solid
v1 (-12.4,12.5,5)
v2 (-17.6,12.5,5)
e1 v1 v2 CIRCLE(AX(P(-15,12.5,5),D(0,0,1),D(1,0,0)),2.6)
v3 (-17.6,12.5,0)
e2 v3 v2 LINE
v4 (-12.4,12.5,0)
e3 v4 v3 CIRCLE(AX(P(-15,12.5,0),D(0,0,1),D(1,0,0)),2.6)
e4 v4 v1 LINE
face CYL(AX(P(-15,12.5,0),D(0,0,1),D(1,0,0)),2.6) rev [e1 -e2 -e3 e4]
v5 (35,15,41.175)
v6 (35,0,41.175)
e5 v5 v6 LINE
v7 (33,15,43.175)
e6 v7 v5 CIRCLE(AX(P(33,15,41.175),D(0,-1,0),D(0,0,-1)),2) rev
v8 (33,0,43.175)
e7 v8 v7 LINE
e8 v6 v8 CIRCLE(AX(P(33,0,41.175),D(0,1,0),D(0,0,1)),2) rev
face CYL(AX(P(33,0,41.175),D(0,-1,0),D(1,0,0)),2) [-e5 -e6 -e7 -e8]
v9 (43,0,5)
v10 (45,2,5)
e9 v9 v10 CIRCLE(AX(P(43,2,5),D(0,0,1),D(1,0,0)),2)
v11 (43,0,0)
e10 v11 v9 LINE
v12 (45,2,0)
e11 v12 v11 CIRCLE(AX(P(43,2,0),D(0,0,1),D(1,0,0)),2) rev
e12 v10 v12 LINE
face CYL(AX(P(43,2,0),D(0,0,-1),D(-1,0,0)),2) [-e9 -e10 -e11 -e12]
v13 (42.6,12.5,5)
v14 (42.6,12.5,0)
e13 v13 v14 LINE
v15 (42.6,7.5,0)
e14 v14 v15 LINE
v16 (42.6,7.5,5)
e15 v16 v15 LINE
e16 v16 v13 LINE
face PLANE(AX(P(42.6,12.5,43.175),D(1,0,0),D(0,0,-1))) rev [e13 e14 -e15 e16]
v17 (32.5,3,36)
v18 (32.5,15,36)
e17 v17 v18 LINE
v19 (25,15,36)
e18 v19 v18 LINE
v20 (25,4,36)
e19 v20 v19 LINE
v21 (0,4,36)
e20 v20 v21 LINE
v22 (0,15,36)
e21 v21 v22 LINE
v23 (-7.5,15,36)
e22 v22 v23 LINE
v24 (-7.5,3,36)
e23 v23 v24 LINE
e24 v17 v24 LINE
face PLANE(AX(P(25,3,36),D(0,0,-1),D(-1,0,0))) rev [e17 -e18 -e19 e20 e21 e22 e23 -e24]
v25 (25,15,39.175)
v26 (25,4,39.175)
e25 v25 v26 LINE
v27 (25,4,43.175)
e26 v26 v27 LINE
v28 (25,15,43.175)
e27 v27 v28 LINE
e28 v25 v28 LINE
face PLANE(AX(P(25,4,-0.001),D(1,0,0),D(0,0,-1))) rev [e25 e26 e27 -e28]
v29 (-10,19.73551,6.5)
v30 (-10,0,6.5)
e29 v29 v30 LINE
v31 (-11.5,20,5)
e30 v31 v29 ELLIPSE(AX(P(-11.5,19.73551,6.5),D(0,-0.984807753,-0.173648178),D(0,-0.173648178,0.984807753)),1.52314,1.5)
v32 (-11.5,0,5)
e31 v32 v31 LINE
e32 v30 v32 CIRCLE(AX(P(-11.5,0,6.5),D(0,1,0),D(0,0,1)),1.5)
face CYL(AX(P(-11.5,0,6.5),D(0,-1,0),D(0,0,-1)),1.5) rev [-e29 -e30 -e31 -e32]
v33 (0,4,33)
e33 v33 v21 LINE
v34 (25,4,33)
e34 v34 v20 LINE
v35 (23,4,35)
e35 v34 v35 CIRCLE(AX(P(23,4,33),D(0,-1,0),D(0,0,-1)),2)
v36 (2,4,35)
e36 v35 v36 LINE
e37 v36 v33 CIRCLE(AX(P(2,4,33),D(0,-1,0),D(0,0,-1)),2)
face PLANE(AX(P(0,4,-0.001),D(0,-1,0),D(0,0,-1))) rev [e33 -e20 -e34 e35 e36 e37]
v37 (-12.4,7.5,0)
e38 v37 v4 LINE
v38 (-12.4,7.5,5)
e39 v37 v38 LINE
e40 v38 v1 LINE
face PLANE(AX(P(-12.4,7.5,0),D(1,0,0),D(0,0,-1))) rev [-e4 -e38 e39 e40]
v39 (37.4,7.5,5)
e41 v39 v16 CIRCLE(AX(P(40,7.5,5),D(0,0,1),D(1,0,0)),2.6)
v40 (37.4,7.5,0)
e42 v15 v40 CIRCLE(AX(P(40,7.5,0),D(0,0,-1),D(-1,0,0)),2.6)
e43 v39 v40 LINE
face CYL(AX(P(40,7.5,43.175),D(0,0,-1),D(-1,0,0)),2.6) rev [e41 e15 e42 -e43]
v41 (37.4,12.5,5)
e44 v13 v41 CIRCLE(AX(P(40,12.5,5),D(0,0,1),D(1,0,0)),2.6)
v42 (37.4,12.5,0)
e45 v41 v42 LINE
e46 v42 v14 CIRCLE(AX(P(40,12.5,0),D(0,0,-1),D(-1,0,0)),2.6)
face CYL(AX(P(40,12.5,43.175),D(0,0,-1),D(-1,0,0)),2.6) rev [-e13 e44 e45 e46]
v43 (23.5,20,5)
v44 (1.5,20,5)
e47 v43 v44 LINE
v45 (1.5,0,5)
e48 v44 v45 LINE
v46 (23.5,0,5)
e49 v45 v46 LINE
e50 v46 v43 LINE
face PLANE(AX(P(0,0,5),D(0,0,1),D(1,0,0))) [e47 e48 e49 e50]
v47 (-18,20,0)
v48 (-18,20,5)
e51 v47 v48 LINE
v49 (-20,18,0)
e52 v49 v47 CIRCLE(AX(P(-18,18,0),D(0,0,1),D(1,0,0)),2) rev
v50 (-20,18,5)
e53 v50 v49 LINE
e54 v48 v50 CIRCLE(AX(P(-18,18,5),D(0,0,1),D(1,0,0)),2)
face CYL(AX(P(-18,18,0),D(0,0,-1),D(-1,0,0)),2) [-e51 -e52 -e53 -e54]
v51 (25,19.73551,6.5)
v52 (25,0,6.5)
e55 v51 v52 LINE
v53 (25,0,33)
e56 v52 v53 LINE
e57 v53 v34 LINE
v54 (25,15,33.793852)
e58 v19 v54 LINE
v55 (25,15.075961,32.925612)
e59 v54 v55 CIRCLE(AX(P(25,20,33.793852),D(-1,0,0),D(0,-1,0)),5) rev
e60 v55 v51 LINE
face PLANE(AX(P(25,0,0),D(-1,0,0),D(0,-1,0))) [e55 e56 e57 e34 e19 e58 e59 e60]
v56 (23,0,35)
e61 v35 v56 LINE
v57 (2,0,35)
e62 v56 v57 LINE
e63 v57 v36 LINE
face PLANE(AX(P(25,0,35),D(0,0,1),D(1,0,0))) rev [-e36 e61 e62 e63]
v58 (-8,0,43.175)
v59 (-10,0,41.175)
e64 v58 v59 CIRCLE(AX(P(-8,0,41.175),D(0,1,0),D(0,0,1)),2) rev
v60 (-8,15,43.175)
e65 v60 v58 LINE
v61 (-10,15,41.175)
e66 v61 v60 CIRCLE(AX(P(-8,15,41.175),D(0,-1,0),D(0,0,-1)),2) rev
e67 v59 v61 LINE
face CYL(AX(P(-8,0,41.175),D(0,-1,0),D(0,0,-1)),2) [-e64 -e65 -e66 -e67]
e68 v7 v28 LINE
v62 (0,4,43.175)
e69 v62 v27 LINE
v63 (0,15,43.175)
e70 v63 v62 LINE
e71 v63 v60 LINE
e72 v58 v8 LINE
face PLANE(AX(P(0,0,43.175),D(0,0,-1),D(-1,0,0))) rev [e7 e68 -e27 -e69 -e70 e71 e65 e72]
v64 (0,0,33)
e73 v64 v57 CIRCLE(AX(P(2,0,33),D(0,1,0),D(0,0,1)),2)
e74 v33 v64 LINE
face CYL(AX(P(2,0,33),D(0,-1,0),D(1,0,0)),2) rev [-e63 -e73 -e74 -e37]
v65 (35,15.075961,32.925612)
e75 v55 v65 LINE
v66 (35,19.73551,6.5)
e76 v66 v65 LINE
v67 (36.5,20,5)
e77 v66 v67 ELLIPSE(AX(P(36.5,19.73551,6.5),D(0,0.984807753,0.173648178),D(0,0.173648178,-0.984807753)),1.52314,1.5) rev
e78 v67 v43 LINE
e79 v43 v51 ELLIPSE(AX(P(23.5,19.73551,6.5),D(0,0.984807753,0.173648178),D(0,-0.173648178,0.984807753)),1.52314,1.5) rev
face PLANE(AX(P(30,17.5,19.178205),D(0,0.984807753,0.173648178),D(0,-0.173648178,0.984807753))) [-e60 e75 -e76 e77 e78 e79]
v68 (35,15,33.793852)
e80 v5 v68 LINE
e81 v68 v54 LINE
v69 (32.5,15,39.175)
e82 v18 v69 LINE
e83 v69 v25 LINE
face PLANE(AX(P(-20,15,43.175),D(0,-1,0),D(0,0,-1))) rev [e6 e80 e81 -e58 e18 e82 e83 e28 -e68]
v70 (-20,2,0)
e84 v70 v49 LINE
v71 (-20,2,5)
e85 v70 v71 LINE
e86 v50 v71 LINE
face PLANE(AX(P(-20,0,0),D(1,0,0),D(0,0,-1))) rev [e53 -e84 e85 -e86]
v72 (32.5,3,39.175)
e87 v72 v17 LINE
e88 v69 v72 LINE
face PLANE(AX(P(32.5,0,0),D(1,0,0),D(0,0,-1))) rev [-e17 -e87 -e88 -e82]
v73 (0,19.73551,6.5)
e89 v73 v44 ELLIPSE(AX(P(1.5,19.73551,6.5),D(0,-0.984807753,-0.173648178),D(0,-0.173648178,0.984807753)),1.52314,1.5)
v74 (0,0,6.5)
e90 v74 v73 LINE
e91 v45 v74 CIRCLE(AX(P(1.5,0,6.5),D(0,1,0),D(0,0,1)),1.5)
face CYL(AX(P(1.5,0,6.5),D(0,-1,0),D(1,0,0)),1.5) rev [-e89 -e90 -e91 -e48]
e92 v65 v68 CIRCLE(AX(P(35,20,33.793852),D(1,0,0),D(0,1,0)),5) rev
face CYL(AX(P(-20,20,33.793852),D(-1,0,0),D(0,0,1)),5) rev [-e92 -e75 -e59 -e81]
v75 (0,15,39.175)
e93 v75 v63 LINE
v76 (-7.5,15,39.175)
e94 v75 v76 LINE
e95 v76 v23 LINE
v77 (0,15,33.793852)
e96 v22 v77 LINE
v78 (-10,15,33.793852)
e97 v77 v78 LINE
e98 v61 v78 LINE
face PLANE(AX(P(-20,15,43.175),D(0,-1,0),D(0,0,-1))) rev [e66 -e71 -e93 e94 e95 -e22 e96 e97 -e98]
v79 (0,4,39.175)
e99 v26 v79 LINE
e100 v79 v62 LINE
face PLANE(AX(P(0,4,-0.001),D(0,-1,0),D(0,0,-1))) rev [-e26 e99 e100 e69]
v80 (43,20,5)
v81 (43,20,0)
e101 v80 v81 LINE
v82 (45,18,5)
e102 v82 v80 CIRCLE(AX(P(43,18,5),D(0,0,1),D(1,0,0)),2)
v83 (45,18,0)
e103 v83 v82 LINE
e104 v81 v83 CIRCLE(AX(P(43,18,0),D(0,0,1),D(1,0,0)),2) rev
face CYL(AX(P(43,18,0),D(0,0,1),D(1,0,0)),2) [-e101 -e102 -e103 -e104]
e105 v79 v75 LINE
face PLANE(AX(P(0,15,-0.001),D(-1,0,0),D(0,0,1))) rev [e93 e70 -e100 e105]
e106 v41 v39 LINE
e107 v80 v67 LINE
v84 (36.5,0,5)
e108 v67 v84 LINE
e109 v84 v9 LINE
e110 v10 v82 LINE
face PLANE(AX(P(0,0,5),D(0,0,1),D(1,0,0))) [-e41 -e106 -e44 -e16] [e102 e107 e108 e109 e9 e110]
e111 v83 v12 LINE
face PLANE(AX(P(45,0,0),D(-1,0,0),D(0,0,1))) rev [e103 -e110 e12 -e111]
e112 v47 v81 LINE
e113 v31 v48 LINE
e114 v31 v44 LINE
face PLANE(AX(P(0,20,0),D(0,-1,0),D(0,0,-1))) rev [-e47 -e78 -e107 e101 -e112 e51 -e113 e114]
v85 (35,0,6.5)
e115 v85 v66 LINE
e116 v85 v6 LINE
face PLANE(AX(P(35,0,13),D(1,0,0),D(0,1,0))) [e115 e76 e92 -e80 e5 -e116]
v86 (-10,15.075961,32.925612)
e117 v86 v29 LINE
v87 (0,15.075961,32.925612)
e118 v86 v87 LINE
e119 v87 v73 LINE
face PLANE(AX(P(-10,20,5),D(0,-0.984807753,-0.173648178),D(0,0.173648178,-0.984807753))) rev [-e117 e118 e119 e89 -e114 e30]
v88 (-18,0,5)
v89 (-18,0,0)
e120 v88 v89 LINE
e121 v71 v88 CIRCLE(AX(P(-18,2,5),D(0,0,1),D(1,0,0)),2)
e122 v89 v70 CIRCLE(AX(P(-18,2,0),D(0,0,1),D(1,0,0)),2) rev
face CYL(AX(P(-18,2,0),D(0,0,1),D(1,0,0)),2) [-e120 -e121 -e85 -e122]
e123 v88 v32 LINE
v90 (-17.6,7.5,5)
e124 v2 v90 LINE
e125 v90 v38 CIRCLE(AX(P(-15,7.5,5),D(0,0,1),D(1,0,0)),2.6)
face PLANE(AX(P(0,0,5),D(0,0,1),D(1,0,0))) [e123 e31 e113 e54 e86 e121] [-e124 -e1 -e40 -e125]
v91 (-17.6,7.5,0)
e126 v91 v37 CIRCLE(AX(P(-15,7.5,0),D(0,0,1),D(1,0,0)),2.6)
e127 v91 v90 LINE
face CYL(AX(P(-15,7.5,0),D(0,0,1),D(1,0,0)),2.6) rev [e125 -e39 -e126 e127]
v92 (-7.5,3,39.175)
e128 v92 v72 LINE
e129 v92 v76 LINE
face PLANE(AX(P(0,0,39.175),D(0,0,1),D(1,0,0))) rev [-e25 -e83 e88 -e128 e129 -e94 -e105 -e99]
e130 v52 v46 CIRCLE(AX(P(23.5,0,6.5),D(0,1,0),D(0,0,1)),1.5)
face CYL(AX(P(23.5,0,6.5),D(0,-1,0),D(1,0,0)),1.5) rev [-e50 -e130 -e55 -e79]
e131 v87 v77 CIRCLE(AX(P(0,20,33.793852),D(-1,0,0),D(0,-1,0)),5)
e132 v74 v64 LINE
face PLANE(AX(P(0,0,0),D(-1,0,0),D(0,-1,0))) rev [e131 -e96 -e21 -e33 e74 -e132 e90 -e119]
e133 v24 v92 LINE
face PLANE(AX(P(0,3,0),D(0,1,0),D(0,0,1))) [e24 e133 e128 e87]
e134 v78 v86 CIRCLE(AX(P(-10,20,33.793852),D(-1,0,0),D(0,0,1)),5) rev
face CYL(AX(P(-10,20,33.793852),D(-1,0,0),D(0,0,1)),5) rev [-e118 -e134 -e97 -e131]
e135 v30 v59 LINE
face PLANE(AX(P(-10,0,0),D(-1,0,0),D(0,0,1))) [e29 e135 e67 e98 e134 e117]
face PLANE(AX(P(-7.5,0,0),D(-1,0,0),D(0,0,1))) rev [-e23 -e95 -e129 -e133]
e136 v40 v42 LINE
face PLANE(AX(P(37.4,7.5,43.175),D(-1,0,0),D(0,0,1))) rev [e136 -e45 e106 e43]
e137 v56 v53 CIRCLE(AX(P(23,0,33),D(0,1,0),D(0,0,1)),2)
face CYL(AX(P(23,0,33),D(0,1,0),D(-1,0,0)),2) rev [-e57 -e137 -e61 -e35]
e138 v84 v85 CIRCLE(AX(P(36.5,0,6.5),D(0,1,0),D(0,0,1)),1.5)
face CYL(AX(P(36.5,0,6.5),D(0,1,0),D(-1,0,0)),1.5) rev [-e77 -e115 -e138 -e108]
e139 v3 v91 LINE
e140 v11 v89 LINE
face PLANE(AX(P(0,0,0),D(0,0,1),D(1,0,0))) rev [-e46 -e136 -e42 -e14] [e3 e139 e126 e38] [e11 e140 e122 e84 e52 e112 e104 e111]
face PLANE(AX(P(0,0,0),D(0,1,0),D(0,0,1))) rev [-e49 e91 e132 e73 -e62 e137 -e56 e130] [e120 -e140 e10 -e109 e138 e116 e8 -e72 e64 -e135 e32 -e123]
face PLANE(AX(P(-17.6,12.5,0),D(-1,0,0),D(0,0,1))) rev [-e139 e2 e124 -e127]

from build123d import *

# Parameters (mm, degrees)
BOSS_EXTRUDE1_DEPTH = 35
CUT_EXTRUDE1_DEPTH  = 25
SKETCH3_W           = 25
SKETCH3_H           = 28.356409098
BOSS_EXTRUDE2_DEPTH = 5
BOSS_EXTRUDE3_DEPTH = 10
SKETCH5_W           = 28.356409098
SKETCH5_H           = 20
BOSS_EXTRUDE4_DEPTH = 10
SKETCH6_W           = 55
SKETCH6_H           = 15
BOSS_EXTRUDE5_DEPTH = 9.818590902
SKETCH7_W           = 28.356409098
SKETCH7_H           = 20
BOSS_EXTRUDE6_DEPTH = 10
SKETCH8_W           = 65
SKETCH8_H           = 20
BOSS_EXTRUDE7_DEPTH = 5
SKETCH9_W           = 10
SKETCH9_H           = 20
CUT_EXTRUDE2_DEPTH  = 28.356409098
SKETCH10_W          = 9.818590902
SKETCH10_H          = 15
CUT_EXTRUDE3_DEPTH  = 10
SKETCH11_W          = 10
SKETCH11_H          = 20
CUT_EXTRUDE4_DEPTH  = 28.356409098
SKETCH12_W          = 15
SKETCH12_H          = 1.643590902
CUT_EXTRUDE5_DEPTH  = 25
SKETCH13_W          = 25
SKETCH13_H          = 20
CUT_EXTRUDE6_DEPTH  = 28.356409098
CUT_EXTRUDE7_REACH  = 64.926
SKETCH14_W          = 25
SKETCH14_H          = 11
SKETCH15_W          = 25
SKETCH15_H          = 3.175
CUT_EXTRUDE8_DEPTH  = 1
CUT_EXTRUDE9_REACH  = 72.854
SKETCH16_W          = 3.175
SKETCH16_H          = 12
CUT_EXTRUDE10_REACH = 72.854
SKETCH17_W          = 12
SKETCH17_H          = 3.175
CUT_EXTRUDE11_REACH = 67.491
SKETCH18_W          = 25
SKETCH18_H          = 11
CUT_EXTRUDE12_DEPTH = 66.491072865
CUT_EXTRUDE13_DEPTH = 63.308351166
FILLET1_R           = 1.5
FILLET2_R           = 2
FILLET3_R           = 5


with BuildPart() as part:
    # Boss-Extrude1: read off the stored shape, not the designer's step
    # Boss-Extrude1 outline → Boss-Extrude1 (new body)
    with BuildSketch(Plane.YZ):
        Polygon((0, 5), (20, 5), (15, 33.356409098), (0, 33.356409098), align=None)
    extrude(amount=BOSS_EXTRUDE1_DEPTH)

    # Sketch2 → Cut-Extrude1 (cut)
    with BuildSketch(Plane.ZY):
        Polygon((33.356409098, 15), (5, 20), (5, 15), align=None)
    extrude(amount=-CUT_EXTRUDE1_DEPTH, mode=Mode.SUBTRACT)

    # Sketch3 → Boss-Extrude2 (add)
    with BuildSketch(Plane(origin=(0, 15, 0), x_dir=(-1, 0, 0), z_dir=(0, 1, 0))):
        with Locations((-12.5, 19.178204549)):
            Rectangle(SKETCH3_W, SKETCH3_H)
    extrude(amount=BOSS_EXTRUDE2_DEPTH)

    # Sketch4 → Boss-Extrude3 (add)
    with BuildSketch(Plane.ZY):
        Polygon((5, 20), (33.356409098, 15), (33.356409098, 0), (5, 0), align=None)
    extrude(amount=BOSS_EXTRUDE3_DEPTH)

    # Sketch5 → Boss-Extrude4 (add)
    with BuildSketch(Plane.ZY.offset(10)):
        with Locations((19.178204549, 10)):
            Rectangle(SKETCH5_W, SKETCH5_H)
    extrude(amount=BOSS_EXTRUDE4_DEPTH)

    # Sketch6 → Boss-Extrude5 (add)
    with BuildSketch(Plane.XY.offset(33.356409098)):
        with Locations((7.5, 7.5)):
            Rectangle(SKETCH6_W, SKETCH6_H)
    extrude(amount=BOSS_EXTRUDE5_DEPTH)

    # Sketch7 → Boss-Extrude6 (add)
    with BuildSketch(Plane(origin=(35, 0, 0), x_dir=(0, 0, -1), z_dir=(1, 0, 0))):
        with Locations((-19.178204549, 10)):
            Rectangle(SKETCH7_W, SKETCH7_H)
    extrude(amount=BOSS_EXTRUDE6_DEPTH)

    # Sketch8 → Boss-Extrude7 (add)
    with BuildSketch(Plane(origin=(0, 0, 5), x_dir=(-1, 0, 0), z_dir=(0, 0, -1))):
        with Locations((-12.5, 10)):
            Rectangle(SKETCH8_W, SKETCH8_H)
    extrude(amount=BOSS_EXTRUDE7_DEPTH)

    # Sketch9 → Cut-Extrude2 (cut)
    with BuildSketch(Plane.XY.offset(33.356409098)):
        with Locations((40, 10)):
            Rectangle(SKETCH9_W, SKETCH9_H)
    extrude(amount=-CUT_EXTRUDE2_DEPTH, mode=Mode.SUBTRACT)

    # Sketch10 → Cut-Extrude3 (cut)
    with BuildSketch(Plane.ZY.offset(20)):
        with Locations((38.265704549, 7.5)):
            Rectangle(SKETCH10_W, SKETCH10_H)
    extrude(amount=-CUT_EXTRUDE3_DEPTH, mode=Mode.SUBTRACT)

    # Sketch11 → Cut-Extrude4 (cut)
    with BuildSketch(Plane.XY.offset(33.356409098)):
        with Locations((-15, 10)):
            Rectangle(SKETCH11_W, SKETCH11_H)
    extrude(amount=-CUT_EXTRUDE4_DEPTH, mode=Mode.SUBTRACT)

    # Sketch12 → Cut-Extrude5 (cut)
    with BuildSketch(Plane(origin=(0, 0, 0), x_dir=(0, -1, 0), z_dir=(-1, 0, 0))):
        with Locations((-7.5, 34.178204549)):
            Rectangle(SKETCH12_W, SKETCH12_H)
    extrude(amount=-CUT_EXTRUDE5_DEPTH, mode=Mode.SUBTRACT)

    # Sketch13 → Cut-Extrude6 (cut)
    with BuildSketch(Plane.XY.offset(33.356409098)):
        with Locations((12.5, 10)):
            Rectangle(SKETCH13_W, SKETCH13_H)
    extrude(amount=-CUT_EXTRUDE6_DEPTH, mode=Mode.SUBTRACT)

    # Sketch14 → Cut-Extrude7 (cut, up to next)
    with BuildSketch(Plane.XY.offset(39.175), mode=Mode.PRIVATE) as cut_extrude7_sk1:
        with Locations((12.5, 9.5)):
            Rectangle(SKETCH14_W, SKETCH14_H)
    cut_extrude7_tool1 = extrude(cut_extrude7_sk1.sketch, amount=-CUT_EXTRUDE7_REACH, mode=Mode.PRIVATE) & part.part
    add(cut_extrude7_tool1.solids().sort_by_distance((12.5, 9.5, 39.175))[0], mode=Mode.SUBTRACT)

    # Sketch15 → Cut-Extrude8 (cut)
    with BuildSketch(Plane(origin=(0, 4, 0), x_dir=(-1, 0, 0), z_dir=(0, 1, 0))):
        with Locations((-12.5, 37.5875)):
            Rectangle(SKETCH15_W, SKETCH15_H)
    extrude(amount=-CUT_EXTRUDE8_DEPTH, mode=Mode.SUBTRACT)

    # Sketch16 → Cut-Extrude9 (cut, up to next)
    with BuildSketch(Plane(origin=(32.5, 0, 0), x_dir=(0, 0, -1), z_dir=(1, 0, 0)), mode=Mode.PRIVATE) as cut_extrude9_sk1:
        with Locations((-37.5875, 9)):
            Rectangle(SKETCH16_W, SKETCH16_H)
    cut_extrude9_tool1 = extrude(cut_extrude9_sk1.sketch, amount=-CUT_EXTRUDE9_REACH, mode=Mode.PRIVATE) & part.part
    add(cut_extrude9_tool1.solids().sort_by_distance((32.5, 9, 37.5875))[0], mode=Mode.SUBTRACT)

    # Sketch17 → Cut-Extrude10 (cut, up to next)
    with BuildSketch(Plane(origin=(-7.5, 0, 0), x_dir=(0, -1, 0), z_dir=(-1, 0, 0)), mode=Mode.PRIVATE) as cut_extrude10_sk1:
        with Locations((-9, 37.5875)):
            Rectangle(SKETCH17_W, SKETCH17_H)
    cut_extrude10_tool1 = extrude(cut_extrude10_sk1.sketch, amount=-CUT_EXTRUDE10_REACH, mode=Mode.PRIVATE) & part.part
    add(cut_extrude10_tool1.solids().sort_by_distance((-7.5, 9, 37.5875))[0], mode=Mode.SUBTRACT)

    # Sketch18 → Cut-Extrude11 (cut, up to next)
    with BuildSketch(Plane.XY.offset(43.175), mode=Mode.PRIVATE) as cut_extrude11_sk1:
        with Locations((12.5, 9.5)):
            Rectangle(SKETCH18_W, SKETCH18_H)
    cut_extrude11_tool1 = extrude(cut_extrude11_sk1.sketch, amount=-CUT_EXTRUDE11_REACH, mode=Mode.PRIVATE) & part.part
    add(cut_extrude11_tool1.solids().sort_by_distance((12.5, 9.5, 43.175))[0], mode=Mode.SUBTRACT)

    # Sketch19 → Cut-Extrude12 (cut, through all)
    with BuildSketch(Plane(origin=(0, 0, 0), x_dir=(-1, 0, 0), z_dir=(0, 0, -1))):
        with BuildLine():
            Line((-37.4, 7.5), (-37.4, 12.5))
            ThreePointArc((-37.4, 12.5), (-40, 15.1), (-42.6, 12.5))
            Line((-42.6, 12.5), (-42.6, 7.5))
            ThreePointArc((-42.6, 7.5), (-40, 4.9), (-37.4, 7.5))
        make_face()
    extrude(amount=-CUT_EXTRUDE12_DEPTH, mode=Mode.SUBTRACT)

    # Sketch20 → Cut-Extrude13 (cut, through all)
    with BuildSketch(Plane.XY.offset(5)):
        with BuildLine():
            Line((-12.4, 7.5), (-12.4, 12.5))
            ThreePointArc((-12.4, 12.5), (-15, 15.1), (-17.6, 12.5))
            Line((-17.6, 12.5), (-17.6, 7.5))
            ThreePointArc((-17.6, 7.5), (-15, 4.9), (-12.4, 7.5))
        make_face()
    extrude(amount=-CUT_EXTRUDE13_DEPTH, mode=Mode.SUBTRACT)

    # Fillet1
    fillet1_edges = [part.edges().sort_by_distance(p)[0] for p in [
        (35, 10, 5),
        (-10, 10, 5),
        (0, 10, 5),
        (25, 10, 5),
    ]]
    fillet(fillet1_edges, radius=FILLET1_R)

    # Fillet2
    fillet2_edges = [part.edges().sort_by_distance(p)[0] for p in [
        (-20, 0, 2.5),
        (0, 2, 35),
        (45, 0, 2.5),
        (45, 20, 2.5),
        (25, 2, 35),
        (-20, 20, 2.5),
        (-10, 7.5, 43.175),
        (35, 7.5, 43.175),
    ]]
    fillet(fillet2_edges, radius=FILLET2_R)

    # Fillet3
    fillet3_edges = [part.edges().sort_by_distance(p)[0] for p in [
        (30, 15, 33.356409098),
        (-5, 15, 33.356409098),
    ]]
    fillet(fillet3_edges, radius=FILLET3_R)


solid = part.part
